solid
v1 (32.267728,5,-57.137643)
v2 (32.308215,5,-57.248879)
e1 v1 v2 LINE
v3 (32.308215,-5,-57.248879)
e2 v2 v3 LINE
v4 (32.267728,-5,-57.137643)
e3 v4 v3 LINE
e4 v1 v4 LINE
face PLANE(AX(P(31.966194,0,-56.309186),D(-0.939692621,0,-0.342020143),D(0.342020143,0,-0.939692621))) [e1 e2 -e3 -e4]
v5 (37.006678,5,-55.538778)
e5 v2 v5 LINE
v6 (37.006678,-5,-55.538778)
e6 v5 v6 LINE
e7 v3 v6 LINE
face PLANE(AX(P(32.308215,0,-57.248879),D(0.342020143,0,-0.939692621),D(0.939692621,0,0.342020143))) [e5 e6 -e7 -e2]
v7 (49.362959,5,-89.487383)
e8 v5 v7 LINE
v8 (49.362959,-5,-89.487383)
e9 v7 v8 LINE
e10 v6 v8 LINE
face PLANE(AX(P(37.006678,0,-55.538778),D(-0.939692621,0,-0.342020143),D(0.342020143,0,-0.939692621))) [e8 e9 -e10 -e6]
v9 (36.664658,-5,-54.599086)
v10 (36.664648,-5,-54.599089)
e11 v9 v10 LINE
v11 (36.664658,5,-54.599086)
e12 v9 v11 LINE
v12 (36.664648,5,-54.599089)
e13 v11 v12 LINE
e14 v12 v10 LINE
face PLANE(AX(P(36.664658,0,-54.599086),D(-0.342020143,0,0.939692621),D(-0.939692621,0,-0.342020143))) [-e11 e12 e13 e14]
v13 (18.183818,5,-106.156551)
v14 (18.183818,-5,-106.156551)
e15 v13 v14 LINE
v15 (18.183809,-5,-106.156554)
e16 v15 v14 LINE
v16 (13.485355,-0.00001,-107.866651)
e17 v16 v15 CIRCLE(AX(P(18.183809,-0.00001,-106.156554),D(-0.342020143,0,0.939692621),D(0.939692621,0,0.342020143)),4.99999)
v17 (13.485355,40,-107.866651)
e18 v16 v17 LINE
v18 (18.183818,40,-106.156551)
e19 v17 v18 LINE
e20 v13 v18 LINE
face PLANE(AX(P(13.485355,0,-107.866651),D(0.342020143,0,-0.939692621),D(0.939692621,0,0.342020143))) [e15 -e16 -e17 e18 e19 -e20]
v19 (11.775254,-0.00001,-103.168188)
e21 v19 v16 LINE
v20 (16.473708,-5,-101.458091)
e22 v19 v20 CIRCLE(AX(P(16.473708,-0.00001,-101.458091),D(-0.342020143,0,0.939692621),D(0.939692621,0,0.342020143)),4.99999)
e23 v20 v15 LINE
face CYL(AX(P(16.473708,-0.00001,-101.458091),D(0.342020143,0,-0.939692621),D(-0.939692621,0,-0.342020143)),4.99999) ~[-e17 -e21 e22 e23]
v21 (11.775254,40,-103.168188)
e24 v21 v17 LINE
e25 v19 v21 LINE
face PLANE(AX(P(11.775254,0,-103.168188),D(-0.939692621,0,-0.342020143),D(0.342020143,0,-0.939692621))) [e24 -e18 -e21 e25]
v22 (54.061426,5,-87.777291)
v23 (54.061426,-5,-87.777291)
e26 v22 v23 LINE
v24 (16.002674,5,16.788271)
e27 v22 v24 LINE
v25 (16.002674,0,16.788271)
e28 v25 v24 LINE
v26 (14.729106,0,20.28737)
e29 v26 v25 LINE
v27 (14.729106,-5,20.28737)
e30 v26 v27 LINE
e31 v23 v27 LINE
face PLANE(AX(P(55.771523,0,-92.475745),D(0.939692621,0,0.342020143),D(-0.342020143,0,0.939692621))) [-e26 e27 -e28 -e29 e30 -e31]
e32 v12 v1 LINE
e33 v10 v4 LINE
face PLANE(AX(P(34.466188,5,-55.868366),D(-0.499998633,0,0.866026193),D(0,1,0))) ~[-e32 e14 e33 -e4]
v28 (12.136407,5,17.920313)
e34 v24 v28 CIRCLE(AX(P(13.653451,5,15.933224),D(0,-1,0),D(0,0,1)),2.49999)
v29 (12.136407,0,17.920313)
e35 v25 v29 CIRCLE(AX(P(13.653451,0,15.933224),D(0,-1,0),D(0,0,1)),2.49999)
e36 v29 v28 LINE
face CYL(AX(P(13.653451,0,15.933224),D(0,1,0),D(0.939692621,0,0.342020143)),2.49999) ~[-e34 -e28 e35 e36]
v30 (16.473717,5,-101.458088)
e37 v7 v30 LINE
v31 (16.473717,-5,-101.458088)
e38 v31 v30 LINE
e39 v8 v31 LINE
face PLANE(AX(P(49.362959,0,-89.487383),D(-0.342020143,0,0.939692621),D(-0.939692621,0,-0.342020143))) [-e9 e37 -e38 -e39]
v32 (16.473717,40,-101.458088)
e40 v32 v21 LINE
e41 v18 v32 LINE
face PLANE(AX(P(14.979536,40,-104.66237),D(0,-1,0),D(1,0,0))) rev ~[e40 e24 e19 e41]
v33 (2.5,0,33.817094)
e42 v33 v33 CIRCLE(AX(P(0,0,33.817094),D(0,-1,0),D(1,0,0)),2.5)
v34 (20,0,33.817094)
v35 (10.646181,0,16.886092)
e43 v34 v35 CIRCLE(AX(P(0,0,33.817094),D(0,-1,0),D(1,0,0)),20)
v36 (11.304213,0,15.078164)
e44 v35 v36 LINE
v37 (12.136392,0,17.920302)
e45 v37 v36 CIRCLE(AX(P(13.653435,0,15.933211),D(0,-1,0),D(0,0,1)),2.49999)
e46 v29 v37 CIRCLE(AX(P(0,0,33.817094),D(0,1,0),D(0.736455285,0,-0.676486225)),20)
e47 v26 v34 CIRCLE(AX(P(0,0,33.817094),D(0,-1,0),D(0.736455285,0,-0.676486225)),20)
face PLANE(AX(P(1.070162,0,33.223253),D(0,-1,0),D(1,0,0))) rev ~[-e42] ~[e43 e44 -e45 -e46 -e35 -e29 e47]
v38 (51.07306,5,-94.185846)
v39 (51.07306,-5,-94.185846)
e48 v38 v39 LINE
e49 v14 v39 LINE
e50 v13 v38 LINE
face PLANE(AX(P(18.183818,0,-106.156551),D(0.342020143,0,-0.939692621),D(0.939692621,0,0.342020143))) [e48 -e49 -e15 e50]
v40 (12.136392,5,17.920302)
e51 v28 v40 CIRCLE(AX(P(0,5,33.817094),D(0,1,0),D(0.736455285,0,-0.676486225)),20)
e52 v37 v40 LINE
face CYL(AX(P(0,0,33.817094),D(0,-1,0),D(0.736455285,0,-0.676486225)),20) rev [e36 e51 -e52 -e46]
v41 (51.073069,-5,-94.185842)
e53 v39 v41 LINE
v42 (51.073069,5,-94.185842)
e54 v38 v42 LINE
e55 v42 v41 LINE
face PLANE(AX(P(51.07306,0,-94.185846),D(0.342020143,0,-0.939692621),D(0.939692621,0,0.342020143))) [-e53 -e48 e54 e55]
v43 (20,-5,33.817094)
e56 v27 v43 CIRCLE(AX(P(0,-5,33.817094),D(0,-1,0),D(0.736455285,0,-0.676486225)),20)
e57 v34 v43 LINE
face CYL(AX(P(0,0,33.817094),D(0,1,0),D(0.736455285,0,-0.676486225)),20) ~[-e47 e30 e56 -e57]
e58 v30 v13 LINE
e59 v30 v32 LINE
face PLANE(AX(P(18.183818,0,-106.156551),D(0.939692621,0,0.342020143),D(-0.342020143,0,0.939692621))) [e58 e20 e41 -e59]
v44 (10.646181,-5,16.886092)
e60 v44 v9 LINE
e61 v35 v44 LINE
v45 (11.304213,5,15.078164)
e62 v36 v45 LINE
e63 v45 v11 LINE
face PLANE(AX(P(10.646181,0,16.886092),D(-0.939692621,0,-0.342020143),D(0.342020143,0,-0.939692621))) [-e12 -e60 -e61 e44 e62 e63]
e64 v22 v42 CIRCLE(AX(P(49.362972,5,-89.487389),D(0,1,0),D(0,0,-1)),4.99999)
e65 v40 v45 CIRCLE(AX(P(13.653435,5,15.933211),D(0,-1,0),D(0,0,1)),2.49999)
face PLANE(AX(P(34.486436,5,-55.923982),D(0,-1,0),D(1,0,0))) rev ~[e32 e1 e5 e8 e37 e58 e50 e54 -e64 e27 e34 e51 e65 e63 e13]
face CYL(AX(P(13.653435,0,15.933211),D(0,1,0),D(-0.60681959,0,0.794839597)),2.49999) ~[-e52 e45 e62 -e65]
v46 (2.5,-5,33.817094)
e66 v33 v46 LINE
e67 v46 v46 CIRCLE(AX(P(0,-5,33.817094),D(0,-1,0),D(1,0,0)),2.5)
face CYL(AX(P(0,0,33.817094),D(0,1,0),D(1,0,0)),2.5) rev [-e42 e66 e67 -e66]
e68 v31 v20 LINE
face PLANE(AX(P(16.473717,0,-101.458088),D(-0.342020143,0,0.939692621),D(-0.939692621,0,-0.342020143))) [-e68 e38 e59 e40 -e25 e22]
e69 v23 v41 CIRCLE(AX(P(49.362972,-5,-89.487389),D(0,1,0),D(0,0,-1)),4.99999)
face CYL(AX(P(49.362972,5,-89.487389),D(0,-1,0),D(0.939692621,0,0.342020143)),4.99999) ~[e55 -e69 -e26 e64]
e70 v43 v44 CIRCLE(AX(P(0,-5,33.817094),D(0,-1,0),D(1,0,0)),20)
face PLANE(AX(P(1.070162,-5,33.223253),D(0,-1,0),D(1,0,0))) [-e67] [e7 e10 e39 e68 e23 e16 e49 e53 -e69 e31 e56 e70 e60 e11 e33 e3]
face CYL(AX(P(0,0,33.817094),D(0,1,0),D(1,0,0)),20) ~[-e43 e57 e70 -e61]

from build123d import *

# Parameters (mm, degrees)
F0_R     = 2.5
F1_DEPTH = 5
F2_DEPTH = 5
F3_R     = 4.99999
F4_R     = 2.49999
F5_SIZE2 = 0.881625
F5_SIZE  = 4.99999
F6_DEPTH = 40


# Not quite as in the source:
# - a fillet or chamfer is up to 0.001 mm smaller than in the source, because OpenCascade refuses the exact size
# - a feature names something its author has since deleted; it is built from what else it names


with BuildPart() as f1:
    # F0 (on Front) → F1 (new body)
    with BuildSketch(Plane.XZ):
        with BuildLine():
            ThreePointArc((14.7291057085, 20.287369527), (18.6357467541, 26.5570015397), (20, 33.8170940264))
            ThreePointArc((20, 33.8170940264), (-17.5060505822, 43.4886085414), (10.6461806987, 16.8860917959))
            ThreePointArc((10.6461806987, 16.8860917959), (12.8011117725, 18.4505219497), (14.7291057085, 20.287369527))
        make_face()
        with Locations((0, 33.8170940264)):
            Circle(F0_R, mode=Mode.SUBTRACT)
        Polygon((18.1838180761, -106.1565507003), (51.0730598036, -94.1858456839), (49.362959087, -89.48738258), (16.4737173595, -101.4580875964), align=None)
        Polygon((13.4853549722, -107.8666514169), (18.1838180761, -106.1565507003), (16.4737173595, -101.4580875964), (11.7752542555, -103.168188313), align=None)
        Polygon((37.0066776717, -55.538778403), (36.6646575283, -54.5990857822), (31.9661944244, -56.3091864988), (32.3082145677, -57.2488791196), align=None)
        with BuildLine():
            ThreePointArc((14.7291057085, 20.287369527), (12.8011117725, 18.4505219497), (10.6461806987, 16.8860917959))
            Line((10.6461806987, 16.8860917959), (36.6646575283, -54.5990857822))
            Line((36.6646575283, -54.5990857822), (37.0066776717, -55.538778403))
            Line((37.0066776717, -55.538778403), (49.362959087, -89.48738258))
            Line((49.362959087, -89.48738258), (51.0730598036, -94.1858456839))
            Line((51.0730598036, -94.1858456839), (55.7715229075, -92.4757449673))
            Line((55.7715229075, -92.4757449673), (14.7291057085, 20.287369527))
        make_face()
    extrude(amount=F1_DEPTH)

    # F0 (on Front) → F2 (join)
    with BuildSketch(Plane.XZ):
        Polygon((37.0066776717, -55.538778403), (36.6646575283, -54.5990857822), (31.9661944244, -56.3091864988), (32.3082145677, -57.2488791196), align=None)
        with BuildLine():
            ThreePointArc((14.7291057085, 20.287369527), (12.8011117725, 18.4505219497), (10.6461806987, 16.8860917959))
            Line((10.6461806987, 16.8860917959), (36.6646575283, -54.5990857822))
            Line((36.6646575283, -54.5990857822), (37.0066776717, -55.538778403))
            Line((37.0066776717, -55.538778403), (49.362959087, -89.48738258))
            Line((49.362959087, -89.48738258), (51.0730598036, -94.1858456839))
            Line((51.0730598036, -94.1858456839), (55.7715229075, -92.4757449673))
            Line((55.7715229075, -92.4757449673), (14.7291057085, 20.287369527))
        make_face()
        Polygon((18.1838180761, -106.1565507003), (51.0730598036, -94.1858456839), (49.362959087, -89.48738258), (16.4737173595, -101.4580875964), align=None)
    extrude(amount=-F2_DEPTH)

    # F3 (radius 5 in the source; OpenCascade refuses exactly that, so slightly less here)
    f3_edges = [f1.edges().sort_by_distance(p)[0] for p in [
        (55.771523, 0, -92.475745),
        (12.630305, -5, -105.51742),
    ]]
    fillet(f3_edges, radius=F3_R)

    # F4 (radius 2.5 in the source; OpenCascade refuses exactly that, so slightly less here)
    f4_edges = [f1.edges().sort_by_distance(p)[0] for p in [
        (14.729106, 2.5, 20.28737),
        (10.646181, 2.5, 16.886092),
    ]]
    fillet(f4_edges, radius=F4_R)

    # F5 (size 5 and 0.8816349035 in the source; OpenCascade refuses exactly that, so slightly less here)
    f5_edges = [f1.edges().sort_by_distance(p)[0] for p in [
        (31.966194, 0, -56.309186),
    ]]
    chamfer(f5_edges, length=F5_SIZE, length2=F5_SIZE2)

    # F0 (on Front) → F6 (join)
    with BuildSketch(Plane.XZ):
        Polygon((13.4853549722, -107.8666514169), (18.1838180761, -106.1565507003), (16.4737173595, -101.4580875964), (11.7752542555, -103.168188313), align=None)
    extrude(amount=-F6_DEPTH)


solid = f1.part
